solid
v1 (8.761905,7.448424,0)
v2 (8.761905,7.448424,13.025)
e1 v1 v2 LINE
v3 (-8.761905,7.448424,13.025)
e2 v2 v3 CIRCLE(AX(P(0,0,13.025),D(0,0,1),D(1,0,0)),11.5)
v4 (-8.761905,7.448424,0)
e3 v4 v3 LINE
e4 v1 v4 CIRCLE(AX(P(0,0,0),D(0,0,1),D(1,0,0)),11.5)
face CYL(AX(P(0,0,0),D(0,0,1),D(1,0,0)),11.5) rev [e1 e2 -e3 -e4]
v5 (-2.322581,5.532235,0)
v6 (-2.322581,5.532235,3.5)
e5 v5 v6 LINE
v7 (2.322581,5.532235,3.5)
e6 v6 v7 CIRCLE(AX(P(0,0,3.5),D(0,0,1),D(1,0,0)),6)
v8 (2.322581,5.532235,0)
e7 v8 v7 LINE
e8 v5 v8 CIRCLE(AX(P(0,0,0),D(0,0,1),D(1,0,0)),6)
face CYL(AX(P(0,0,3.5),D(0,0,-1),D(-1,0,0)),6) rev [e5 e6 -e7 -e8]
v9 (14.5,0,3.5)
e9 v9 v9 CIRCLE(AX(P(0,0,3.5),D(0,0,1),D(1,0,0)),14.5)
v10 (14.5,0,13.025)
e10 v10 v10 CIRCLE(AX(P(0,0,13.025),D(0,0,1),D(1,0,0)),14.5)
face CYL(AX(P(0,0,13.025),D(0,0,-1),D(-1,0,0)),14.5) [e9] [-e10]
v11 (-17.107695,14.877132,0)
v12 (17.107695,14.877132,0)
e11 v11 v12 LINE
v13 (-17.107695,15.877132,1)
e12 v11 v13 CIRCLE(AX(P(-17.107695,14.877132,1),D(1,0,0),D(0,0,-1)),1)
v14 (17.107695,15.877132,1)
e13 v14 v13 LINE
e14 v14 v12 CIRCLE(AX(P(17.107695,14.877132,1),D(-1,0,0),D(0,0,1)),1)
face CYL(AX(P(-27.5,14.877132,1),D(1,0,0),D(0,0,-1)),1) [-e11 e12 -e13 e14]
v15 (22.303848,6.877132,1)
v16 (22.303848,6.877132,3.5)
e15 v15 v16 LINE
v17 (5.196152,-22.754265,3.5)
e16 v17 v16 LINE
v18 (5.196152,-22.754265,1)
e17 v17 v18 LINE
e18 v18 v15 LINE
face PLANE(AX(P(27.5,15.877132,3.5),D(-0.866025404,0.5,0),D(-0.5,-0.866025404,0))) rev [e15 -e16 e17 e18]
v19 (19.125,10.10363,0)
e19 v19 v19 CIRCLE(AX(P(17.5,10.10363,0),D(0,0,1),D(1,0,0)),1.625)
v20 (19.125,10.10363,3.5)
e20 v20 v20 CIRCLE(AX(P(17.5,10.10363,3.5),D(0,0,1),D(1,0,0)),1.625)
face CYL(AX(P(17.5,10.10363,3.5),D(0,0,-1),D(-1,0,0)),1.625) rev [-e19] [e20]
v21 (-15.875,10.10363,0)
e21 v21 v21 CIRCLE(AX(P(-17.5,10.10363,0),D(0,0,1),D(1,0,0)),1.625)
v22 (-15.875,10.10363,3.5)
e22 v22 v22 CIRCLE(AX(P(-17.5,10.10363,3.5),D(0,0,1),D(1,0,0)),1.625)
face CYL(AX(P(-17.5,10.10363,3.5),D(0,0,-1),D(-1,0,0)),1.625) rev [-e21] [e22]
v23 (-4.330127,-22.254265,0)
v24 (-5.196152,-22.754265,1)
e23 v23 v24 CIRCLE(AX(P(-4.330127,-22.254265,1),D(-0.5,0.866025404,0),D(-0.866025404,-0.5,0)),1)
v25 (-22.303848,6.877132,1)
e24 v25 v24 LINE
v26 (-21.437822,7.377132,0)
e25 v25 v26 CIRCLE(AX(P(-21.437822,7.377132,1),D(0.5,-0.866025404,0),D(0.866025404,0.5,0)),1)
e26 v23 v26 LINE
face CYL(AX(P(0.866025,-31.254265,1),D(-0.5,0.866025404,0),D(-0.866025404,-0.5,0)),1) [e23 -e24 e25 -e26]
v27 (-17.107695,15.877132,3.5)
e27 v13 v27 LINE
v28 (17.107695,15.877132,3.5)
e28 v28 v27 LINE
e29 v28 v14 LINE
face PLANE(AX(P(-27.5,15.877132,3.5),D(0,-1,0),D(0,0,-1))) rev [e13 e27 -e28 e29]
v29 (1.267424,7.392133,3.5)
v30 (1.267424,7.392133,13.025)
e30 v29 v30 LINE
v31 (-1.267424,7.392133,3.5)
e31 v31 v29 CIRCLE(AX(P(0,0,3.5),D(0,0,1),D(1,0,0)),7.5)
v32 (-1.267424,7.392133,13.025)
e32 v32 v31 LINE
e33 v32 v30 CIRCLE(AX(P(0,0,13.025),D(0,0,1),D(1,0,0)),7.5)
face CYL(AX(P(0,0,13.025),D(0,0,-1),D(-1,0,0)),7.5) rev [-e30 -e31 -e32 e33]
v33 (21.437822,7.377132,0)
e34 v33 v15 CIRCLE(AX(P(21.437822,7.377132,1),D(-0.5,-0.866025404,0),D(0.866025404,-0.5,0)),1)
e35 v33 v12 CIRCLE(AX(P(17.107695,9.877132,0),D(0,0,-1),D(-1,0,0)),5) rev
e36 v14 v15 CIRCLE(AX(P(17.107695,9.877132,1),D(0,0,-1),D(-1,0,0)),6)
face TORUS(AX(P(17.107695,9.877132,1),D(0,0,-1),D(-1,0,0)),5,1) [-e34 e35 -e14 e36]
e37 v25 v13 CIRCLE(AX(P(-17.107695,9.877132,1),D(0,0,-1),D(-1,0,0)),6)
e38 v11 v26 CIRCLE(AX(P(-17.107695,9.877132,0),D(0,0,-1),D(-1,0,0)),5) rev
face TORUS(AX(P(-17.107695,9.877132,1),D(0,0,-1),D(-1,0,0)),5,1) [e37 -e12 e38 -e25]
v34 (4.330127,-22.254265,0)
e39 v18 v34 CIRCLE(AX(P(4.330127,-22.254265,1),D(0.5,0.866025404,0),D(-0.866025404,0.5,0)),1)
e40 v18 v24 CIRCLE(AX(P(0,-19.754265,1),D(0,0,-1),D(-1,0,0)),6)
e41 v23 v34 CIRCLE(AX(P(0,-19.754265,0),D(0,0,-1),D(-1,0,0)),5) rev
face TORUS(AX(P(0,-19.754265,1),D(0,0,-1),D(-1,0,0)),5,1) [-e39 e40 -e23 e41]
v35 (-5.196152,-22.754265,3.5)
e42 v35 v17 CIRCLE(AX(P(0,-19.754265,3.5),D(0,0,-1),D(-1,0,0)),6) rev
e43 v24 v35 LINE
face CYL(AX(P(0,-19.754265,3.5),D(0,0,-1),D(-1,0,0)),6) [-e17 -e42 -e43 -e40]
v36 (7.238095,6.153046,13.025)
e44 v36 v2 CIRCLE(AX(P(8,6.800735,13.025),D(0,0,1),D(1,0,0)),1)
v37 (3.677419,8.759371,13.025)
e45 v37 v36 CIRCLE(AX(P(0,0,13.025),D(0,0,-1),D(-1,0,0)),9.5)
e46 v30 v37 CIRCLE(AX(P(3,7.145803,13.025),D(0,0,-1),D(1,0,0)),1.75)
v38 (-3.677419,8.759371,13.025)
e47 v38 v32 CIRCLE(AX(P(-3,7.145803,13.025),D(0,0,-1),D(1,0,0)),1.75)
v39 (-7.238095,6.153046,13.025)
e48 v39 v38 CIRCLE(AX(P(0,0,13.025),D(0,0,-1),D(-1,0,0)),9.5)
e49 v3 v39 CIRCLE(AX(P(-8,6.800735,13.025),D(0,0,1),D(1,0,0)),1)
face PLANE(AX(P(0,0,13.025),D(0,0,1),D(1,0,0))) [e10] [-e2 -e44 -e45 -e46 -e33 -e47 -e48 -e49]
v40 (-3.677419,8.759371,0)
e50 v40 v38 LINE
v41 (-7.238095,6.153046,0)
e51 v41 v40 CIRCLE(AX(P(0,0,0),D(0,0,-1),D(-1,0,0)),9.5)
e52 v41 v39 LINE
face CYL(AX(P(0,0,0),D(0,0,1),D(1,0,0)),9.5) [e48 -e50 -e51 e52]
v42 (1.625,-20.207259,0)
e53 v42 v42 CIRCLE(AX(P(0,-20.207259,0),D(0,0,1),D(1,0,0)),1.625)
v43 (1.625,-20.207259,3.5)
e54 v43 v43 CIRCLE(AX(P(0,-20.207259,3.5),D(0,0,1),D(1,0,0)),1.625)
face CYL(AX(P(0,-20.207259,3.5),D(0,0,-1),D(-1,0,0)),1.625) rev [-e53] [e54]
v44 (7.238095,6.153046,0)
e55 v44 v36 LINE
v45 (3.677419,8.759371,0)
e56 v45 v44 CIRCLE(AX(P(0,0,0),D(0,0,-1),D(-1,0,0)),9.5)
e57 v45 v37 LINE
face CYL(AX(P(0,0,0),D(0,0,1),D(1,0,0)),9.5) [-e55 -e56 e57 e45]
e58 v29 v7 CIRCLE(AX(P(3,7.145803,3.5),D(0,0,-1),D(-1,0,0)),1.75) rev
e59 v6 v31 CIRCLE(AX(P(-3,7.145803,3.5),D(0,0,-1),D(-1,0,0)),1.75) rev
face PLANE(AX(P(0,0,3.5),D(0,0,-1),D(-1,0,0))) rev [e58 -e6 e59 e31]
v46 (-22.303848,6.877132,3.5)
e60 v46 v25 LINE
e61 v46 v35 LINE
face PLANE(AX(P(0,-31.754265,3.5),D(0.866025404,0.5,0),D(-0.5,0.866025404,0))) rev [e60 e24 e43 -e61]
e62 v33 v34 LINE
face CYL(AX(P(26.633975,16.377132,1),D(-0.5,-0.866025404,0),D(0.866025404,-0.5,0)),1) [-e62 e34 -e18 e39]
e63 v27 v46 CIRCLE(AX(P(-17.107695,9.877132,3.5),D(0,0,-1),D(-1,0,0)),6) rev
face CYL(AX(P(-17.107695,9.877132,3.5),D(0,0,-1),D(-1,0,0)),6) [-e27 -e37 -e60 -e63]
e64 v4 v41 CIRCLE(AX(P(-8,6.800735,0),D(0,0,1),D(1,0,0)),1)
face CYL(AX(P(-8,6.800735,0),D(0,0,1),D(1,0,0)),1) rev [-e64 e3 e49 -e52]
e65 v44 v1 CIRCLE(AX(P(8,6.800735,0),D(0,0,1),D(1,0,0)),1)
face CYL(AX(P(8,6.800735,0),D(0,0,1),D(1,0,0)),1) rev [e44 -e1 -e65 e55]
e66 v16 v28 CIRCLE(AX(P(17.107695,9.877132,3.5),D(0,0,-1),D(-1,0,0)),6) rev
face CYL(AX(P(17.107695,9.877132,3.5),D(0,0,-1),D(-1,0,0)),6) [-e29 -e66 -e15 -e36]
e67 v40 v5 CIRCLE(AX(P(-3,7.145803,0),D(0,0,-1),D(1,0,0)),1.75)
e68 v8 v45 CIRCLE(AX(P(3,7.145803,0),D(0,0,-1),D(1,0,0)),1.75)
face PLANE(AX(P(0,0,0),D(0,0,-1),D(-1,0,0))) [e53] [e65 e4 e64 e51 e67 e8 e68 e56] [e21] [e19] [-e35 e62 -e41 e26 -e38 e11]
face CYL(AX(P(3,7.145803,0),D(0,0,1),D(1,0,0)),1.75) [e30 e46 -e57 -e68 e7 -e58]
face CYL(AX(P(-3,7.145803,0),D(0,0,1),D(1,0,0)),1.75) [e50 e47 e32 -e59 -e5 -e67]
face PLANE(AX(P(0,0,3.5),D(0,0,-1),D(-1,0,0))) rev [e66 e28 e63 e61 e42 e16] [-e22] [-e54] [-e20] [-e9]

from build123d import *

# Parameters (mm, degrees)
ESQUISSE3_R             = 1.6250000000000002
ESQUISSE3_R_2           = 1.6250000000000007
ESQUISSE3_R_3           = 1.625000000000001
ESQUISSE3_R_4           = 6
BOSS_EXTRU_1_DEPTH      = 3.5
ESQUISSE4_R             = 14.499999999999998
ESQUISSE4_R_2           = 7.5
BOSS_EXTRU_2_DEPTH      = 9.524999999999999
CONG_2_R                = 1
CONG_3_R                = 6
ENL_V_MAT_EXTRU_1_DEPTH = 37.971588497459535
ENL_V_MAT_EXTRU_2_DEPTH = 37.971588497459535


with BuildPart() as part:
    # Esquisse3 → Boss.-Extru.1 (new body)
    with BuildSketch(Plane.XY):
        Polygon((0, -31.754264805429408), (-27.499999999999993, 15.877132402714718), (27.500000000000007, 15.877132402714718), align=None)
        with Locations((-17.5, 10.103629710818455)):
            Circle(ESQUISSE3_R, mode=Mode.SUBTRACT)
        with Locations((17.500000000000007, 10.10362971081846)):
            Circle(ESQUISSE3_R_2, mode=Mode.SUBTRACT)
        with Locations((4.24e-15, -20.2072594216369)):
            Circle(ESQUISSE3_R_3, mode=Mode.SUBTRACT)
        Circle(ESQUISSE3_R_4, mode=Mode.SUBTRACT)
    extrude(amount=BOSS_EXTRU_1_DEPTH)

    # Esquisse4 → Boss.-Extru.2 (add)
    with BuildSketch(Plane.XY.offset(3.5)):
        Circle(ESQUISSE4_R)
        Circle(ESQUISSE4_R_2, mode=Mode.SUBTRACT)
    extrude(amount=BOSS_EXTRU_2_DEPTH)

    # Congé2
    cong_2_edges = [part.edges().sort_by_distance(p)[0] for p in [
        (-13.749999999999996, -7.938566201357347, 0),
        (7.11e-15, 15.877132402714718, 0),
        (13.750000000000004, -7.938566201357343, 0),
    ]]
    fillet(cong_2_edges, radius=CONG_2_R)

    # Congé3
    # the kernel refuses this fillet: 6 mm, written as the material it takes off along each edge
    with BuildSketch(Plane(origin=(8.9e-16, -19.754264805429408, 0), x_dir=(0.8660254037844386, -0.5000000000000001, 0), z_dir=(0.5000000000000001, 0.8660254037844386, 0))) as cong_3_piece_1:
        with BuildLine():
            CenterArc((5, -1), 1, 0, 90)
            Line((6, -1), (6, 0))
            Line((6, 0), (5, 0))
        make_face()
    revolve(axis=Axis((8.9e-16, -19.754264805429408, 0), (0, 0, -1)), revolution_arc=120.00000000000001, mode=Mode.SUBTRACT)
    with BuildSketch(Plane(origin=(17.10769515458674, 9.877132402714714, 0), x_dir=(0, 1, 0), z_dir=(-1, 0, 0))) as cong_3_piece_2:
        with BuildLine():
            CenterArc((5, -1), 1, 0, 90)
            Line((6, -1), (6, 0))
            Line((6, 0), (5, 0))
        make_face()
    revolve(axis=Axis((17.10769515458674, 9.877132402714714, 0), (0, 0, -1)), revolution_arc=120.00000000000001, mode=Mode.SUBTRACT)
    with BuildSketch(Plane(origin=(-17.107695154586732, 9.877132402714722, 0), x_dir=(-0.8660254037844387, -0.49999999999999994, 0), z_dir=(0.49999999999999994, -0.8660254037844387, 0))) as cong_3_piece_3:
        with BuildLine():
            CenterArc((5, -1), 1, 0, 90)
            Line((6, -1), (6, 0))
            Line((6, 0), (5, 0))
        make_face()
    revolve(axis=Axis((-17.107695154586732, 9.877132402714722, 0), (0, 0, -1)), revolution_arc=119.99999999999999, mode=Mode.SUBTRACT)
    with BuildSketch(Plane(origin=(-6.7e-16, -31.754264805429408, -2.2e-16), x_dir=(-0.4999999999999999, 0.8660254037844388, 0), z_dir=(0, 0, 1))) as cong_3_piece_4:
        with BuildLine():
            CenterArc((CONG_3_R * 1.73205080757, -CONG_3_R), CONG_3_R, 90.00000000000003, 119.99999999999994)
            Line((CONG_3_R * 0.866025403784, -CONG_3_R * 1.5), (0, 0))
            Line((0, 0), (CONG_3_R * 1.73205080757, 1.1e-16))
        make_face()
    extrude(amount=29.48076211353316, mode=Mode.SUBTRACT)
    with BuildSketch(Plane(origin=(-27.499999999999996, 15.877132402714722, -2.2e-16), x_dir=(0.5, -0.8660254037844386, 0), z_dir=(0, 0, 1))) as cong_3_piece_5:
        with BuildLine():
            CenterArc((CONG_3_R * 1.73205080757, CONG_3_R), CONG_3_R, 150.00000000000003, 119.99999999999997)
            Line((CONG_3_R * 0.866025403784, CONG_3_R * 1.5), (0, 0))
            Line((0, 0), (CONG_3_R * 1.73205080757, 0))
        make_face()
    extrude(amount=29.480762113533153, mode=Mode.SUBTRACT)
    with BuildSketch(Plane(origin=(27.500000000000007, 15.877132402714718, -2.2e-16), x_dir=(-0.5000000000000001, -0.8660254037844385, 0), z_dir=(0, 0, 1))) as cong_3_piece_6:
        with BuildLine():
            CenterArc((CONG_3_R * 1.73205080757, -CONG_3_R), CONG_3_R, 90.00000000000003, 119.99999999999994)
            Line((CONG_3_R * 0.866025403784, -CONG_3_R * 1.5), (0, 0))
            Line((0, 0), (CONG_3_R * 1.73205080757, 1.1e-16))
        make_face()
    extrude(amount=29.480762113533174, mode=Mode.SUBTRACT)

    # Esquisse5 → Enlèv. mat.-Extru.1 (cut, through all)
    with BuildSketch(Plane.XY.offset(13.024999999999999)):
        with BuildLine():
            ThreePointArc((-7.238095238095237, 6.153046182523176), (5.8e-16, 9.499999999999998), (7.238095238095237, 6.153046182523176))
            ThreePointArc((7.238095238095237, 6.153046182523176), (8.647689071844546, 6.038830492462959), (8.761904761904761, 7.448424326212267))
            ThreePointArc((8.761904761904761, 7.448424326212267), (7e-16, 11.5), (-8.761904761904761, 7.448424326212267))
            ThreePointArc((-8.761904761904761, 7.448424326212267), (-8.647689071844544, 6.038830492462961), (-7.238095238095237, 6.153046182523176))
        make_face()
    extrude(amount=-ENL_V_MAT_EXTRU_1_DEPTH, mode=Mode.SUBTRACT)

    # Esquisse6 → Enlèv. mat.-Extru.2 (cut, through all)
    with BuildSketch(Plane.XY.offset(13.024999999999999)):
        with BuildLine():
            ThreePointArc((-2.322580645161291, 5.532234552757338), (-1.3864315887791117, 7.823222318816936), (-3.677419354838709, 8.759371375199114))
            ThreePointArc((-3.677419354838709, 8.759371375199114), (5.8e-16, 9.499999999999998), (3.677419354838709, 8.759371375199114))
            ThreePointArc((3.677419354838709, 8.759371375199114), (1.3864315887791128, 7.823222318816936), (2.322580645161291, 5.532234552757338))
            ThreePointArc((2.322580645161291, 5.532234552757338), (3.7e-16, 6.000000000000003), (-2.322580645161291, 5.532234552757338))
        make_face()
    extrude(amount=-ENL_V_MAT_EXTRU_2_DEPTH, mode=Mode.SUBTRACT)


solid = part.part
